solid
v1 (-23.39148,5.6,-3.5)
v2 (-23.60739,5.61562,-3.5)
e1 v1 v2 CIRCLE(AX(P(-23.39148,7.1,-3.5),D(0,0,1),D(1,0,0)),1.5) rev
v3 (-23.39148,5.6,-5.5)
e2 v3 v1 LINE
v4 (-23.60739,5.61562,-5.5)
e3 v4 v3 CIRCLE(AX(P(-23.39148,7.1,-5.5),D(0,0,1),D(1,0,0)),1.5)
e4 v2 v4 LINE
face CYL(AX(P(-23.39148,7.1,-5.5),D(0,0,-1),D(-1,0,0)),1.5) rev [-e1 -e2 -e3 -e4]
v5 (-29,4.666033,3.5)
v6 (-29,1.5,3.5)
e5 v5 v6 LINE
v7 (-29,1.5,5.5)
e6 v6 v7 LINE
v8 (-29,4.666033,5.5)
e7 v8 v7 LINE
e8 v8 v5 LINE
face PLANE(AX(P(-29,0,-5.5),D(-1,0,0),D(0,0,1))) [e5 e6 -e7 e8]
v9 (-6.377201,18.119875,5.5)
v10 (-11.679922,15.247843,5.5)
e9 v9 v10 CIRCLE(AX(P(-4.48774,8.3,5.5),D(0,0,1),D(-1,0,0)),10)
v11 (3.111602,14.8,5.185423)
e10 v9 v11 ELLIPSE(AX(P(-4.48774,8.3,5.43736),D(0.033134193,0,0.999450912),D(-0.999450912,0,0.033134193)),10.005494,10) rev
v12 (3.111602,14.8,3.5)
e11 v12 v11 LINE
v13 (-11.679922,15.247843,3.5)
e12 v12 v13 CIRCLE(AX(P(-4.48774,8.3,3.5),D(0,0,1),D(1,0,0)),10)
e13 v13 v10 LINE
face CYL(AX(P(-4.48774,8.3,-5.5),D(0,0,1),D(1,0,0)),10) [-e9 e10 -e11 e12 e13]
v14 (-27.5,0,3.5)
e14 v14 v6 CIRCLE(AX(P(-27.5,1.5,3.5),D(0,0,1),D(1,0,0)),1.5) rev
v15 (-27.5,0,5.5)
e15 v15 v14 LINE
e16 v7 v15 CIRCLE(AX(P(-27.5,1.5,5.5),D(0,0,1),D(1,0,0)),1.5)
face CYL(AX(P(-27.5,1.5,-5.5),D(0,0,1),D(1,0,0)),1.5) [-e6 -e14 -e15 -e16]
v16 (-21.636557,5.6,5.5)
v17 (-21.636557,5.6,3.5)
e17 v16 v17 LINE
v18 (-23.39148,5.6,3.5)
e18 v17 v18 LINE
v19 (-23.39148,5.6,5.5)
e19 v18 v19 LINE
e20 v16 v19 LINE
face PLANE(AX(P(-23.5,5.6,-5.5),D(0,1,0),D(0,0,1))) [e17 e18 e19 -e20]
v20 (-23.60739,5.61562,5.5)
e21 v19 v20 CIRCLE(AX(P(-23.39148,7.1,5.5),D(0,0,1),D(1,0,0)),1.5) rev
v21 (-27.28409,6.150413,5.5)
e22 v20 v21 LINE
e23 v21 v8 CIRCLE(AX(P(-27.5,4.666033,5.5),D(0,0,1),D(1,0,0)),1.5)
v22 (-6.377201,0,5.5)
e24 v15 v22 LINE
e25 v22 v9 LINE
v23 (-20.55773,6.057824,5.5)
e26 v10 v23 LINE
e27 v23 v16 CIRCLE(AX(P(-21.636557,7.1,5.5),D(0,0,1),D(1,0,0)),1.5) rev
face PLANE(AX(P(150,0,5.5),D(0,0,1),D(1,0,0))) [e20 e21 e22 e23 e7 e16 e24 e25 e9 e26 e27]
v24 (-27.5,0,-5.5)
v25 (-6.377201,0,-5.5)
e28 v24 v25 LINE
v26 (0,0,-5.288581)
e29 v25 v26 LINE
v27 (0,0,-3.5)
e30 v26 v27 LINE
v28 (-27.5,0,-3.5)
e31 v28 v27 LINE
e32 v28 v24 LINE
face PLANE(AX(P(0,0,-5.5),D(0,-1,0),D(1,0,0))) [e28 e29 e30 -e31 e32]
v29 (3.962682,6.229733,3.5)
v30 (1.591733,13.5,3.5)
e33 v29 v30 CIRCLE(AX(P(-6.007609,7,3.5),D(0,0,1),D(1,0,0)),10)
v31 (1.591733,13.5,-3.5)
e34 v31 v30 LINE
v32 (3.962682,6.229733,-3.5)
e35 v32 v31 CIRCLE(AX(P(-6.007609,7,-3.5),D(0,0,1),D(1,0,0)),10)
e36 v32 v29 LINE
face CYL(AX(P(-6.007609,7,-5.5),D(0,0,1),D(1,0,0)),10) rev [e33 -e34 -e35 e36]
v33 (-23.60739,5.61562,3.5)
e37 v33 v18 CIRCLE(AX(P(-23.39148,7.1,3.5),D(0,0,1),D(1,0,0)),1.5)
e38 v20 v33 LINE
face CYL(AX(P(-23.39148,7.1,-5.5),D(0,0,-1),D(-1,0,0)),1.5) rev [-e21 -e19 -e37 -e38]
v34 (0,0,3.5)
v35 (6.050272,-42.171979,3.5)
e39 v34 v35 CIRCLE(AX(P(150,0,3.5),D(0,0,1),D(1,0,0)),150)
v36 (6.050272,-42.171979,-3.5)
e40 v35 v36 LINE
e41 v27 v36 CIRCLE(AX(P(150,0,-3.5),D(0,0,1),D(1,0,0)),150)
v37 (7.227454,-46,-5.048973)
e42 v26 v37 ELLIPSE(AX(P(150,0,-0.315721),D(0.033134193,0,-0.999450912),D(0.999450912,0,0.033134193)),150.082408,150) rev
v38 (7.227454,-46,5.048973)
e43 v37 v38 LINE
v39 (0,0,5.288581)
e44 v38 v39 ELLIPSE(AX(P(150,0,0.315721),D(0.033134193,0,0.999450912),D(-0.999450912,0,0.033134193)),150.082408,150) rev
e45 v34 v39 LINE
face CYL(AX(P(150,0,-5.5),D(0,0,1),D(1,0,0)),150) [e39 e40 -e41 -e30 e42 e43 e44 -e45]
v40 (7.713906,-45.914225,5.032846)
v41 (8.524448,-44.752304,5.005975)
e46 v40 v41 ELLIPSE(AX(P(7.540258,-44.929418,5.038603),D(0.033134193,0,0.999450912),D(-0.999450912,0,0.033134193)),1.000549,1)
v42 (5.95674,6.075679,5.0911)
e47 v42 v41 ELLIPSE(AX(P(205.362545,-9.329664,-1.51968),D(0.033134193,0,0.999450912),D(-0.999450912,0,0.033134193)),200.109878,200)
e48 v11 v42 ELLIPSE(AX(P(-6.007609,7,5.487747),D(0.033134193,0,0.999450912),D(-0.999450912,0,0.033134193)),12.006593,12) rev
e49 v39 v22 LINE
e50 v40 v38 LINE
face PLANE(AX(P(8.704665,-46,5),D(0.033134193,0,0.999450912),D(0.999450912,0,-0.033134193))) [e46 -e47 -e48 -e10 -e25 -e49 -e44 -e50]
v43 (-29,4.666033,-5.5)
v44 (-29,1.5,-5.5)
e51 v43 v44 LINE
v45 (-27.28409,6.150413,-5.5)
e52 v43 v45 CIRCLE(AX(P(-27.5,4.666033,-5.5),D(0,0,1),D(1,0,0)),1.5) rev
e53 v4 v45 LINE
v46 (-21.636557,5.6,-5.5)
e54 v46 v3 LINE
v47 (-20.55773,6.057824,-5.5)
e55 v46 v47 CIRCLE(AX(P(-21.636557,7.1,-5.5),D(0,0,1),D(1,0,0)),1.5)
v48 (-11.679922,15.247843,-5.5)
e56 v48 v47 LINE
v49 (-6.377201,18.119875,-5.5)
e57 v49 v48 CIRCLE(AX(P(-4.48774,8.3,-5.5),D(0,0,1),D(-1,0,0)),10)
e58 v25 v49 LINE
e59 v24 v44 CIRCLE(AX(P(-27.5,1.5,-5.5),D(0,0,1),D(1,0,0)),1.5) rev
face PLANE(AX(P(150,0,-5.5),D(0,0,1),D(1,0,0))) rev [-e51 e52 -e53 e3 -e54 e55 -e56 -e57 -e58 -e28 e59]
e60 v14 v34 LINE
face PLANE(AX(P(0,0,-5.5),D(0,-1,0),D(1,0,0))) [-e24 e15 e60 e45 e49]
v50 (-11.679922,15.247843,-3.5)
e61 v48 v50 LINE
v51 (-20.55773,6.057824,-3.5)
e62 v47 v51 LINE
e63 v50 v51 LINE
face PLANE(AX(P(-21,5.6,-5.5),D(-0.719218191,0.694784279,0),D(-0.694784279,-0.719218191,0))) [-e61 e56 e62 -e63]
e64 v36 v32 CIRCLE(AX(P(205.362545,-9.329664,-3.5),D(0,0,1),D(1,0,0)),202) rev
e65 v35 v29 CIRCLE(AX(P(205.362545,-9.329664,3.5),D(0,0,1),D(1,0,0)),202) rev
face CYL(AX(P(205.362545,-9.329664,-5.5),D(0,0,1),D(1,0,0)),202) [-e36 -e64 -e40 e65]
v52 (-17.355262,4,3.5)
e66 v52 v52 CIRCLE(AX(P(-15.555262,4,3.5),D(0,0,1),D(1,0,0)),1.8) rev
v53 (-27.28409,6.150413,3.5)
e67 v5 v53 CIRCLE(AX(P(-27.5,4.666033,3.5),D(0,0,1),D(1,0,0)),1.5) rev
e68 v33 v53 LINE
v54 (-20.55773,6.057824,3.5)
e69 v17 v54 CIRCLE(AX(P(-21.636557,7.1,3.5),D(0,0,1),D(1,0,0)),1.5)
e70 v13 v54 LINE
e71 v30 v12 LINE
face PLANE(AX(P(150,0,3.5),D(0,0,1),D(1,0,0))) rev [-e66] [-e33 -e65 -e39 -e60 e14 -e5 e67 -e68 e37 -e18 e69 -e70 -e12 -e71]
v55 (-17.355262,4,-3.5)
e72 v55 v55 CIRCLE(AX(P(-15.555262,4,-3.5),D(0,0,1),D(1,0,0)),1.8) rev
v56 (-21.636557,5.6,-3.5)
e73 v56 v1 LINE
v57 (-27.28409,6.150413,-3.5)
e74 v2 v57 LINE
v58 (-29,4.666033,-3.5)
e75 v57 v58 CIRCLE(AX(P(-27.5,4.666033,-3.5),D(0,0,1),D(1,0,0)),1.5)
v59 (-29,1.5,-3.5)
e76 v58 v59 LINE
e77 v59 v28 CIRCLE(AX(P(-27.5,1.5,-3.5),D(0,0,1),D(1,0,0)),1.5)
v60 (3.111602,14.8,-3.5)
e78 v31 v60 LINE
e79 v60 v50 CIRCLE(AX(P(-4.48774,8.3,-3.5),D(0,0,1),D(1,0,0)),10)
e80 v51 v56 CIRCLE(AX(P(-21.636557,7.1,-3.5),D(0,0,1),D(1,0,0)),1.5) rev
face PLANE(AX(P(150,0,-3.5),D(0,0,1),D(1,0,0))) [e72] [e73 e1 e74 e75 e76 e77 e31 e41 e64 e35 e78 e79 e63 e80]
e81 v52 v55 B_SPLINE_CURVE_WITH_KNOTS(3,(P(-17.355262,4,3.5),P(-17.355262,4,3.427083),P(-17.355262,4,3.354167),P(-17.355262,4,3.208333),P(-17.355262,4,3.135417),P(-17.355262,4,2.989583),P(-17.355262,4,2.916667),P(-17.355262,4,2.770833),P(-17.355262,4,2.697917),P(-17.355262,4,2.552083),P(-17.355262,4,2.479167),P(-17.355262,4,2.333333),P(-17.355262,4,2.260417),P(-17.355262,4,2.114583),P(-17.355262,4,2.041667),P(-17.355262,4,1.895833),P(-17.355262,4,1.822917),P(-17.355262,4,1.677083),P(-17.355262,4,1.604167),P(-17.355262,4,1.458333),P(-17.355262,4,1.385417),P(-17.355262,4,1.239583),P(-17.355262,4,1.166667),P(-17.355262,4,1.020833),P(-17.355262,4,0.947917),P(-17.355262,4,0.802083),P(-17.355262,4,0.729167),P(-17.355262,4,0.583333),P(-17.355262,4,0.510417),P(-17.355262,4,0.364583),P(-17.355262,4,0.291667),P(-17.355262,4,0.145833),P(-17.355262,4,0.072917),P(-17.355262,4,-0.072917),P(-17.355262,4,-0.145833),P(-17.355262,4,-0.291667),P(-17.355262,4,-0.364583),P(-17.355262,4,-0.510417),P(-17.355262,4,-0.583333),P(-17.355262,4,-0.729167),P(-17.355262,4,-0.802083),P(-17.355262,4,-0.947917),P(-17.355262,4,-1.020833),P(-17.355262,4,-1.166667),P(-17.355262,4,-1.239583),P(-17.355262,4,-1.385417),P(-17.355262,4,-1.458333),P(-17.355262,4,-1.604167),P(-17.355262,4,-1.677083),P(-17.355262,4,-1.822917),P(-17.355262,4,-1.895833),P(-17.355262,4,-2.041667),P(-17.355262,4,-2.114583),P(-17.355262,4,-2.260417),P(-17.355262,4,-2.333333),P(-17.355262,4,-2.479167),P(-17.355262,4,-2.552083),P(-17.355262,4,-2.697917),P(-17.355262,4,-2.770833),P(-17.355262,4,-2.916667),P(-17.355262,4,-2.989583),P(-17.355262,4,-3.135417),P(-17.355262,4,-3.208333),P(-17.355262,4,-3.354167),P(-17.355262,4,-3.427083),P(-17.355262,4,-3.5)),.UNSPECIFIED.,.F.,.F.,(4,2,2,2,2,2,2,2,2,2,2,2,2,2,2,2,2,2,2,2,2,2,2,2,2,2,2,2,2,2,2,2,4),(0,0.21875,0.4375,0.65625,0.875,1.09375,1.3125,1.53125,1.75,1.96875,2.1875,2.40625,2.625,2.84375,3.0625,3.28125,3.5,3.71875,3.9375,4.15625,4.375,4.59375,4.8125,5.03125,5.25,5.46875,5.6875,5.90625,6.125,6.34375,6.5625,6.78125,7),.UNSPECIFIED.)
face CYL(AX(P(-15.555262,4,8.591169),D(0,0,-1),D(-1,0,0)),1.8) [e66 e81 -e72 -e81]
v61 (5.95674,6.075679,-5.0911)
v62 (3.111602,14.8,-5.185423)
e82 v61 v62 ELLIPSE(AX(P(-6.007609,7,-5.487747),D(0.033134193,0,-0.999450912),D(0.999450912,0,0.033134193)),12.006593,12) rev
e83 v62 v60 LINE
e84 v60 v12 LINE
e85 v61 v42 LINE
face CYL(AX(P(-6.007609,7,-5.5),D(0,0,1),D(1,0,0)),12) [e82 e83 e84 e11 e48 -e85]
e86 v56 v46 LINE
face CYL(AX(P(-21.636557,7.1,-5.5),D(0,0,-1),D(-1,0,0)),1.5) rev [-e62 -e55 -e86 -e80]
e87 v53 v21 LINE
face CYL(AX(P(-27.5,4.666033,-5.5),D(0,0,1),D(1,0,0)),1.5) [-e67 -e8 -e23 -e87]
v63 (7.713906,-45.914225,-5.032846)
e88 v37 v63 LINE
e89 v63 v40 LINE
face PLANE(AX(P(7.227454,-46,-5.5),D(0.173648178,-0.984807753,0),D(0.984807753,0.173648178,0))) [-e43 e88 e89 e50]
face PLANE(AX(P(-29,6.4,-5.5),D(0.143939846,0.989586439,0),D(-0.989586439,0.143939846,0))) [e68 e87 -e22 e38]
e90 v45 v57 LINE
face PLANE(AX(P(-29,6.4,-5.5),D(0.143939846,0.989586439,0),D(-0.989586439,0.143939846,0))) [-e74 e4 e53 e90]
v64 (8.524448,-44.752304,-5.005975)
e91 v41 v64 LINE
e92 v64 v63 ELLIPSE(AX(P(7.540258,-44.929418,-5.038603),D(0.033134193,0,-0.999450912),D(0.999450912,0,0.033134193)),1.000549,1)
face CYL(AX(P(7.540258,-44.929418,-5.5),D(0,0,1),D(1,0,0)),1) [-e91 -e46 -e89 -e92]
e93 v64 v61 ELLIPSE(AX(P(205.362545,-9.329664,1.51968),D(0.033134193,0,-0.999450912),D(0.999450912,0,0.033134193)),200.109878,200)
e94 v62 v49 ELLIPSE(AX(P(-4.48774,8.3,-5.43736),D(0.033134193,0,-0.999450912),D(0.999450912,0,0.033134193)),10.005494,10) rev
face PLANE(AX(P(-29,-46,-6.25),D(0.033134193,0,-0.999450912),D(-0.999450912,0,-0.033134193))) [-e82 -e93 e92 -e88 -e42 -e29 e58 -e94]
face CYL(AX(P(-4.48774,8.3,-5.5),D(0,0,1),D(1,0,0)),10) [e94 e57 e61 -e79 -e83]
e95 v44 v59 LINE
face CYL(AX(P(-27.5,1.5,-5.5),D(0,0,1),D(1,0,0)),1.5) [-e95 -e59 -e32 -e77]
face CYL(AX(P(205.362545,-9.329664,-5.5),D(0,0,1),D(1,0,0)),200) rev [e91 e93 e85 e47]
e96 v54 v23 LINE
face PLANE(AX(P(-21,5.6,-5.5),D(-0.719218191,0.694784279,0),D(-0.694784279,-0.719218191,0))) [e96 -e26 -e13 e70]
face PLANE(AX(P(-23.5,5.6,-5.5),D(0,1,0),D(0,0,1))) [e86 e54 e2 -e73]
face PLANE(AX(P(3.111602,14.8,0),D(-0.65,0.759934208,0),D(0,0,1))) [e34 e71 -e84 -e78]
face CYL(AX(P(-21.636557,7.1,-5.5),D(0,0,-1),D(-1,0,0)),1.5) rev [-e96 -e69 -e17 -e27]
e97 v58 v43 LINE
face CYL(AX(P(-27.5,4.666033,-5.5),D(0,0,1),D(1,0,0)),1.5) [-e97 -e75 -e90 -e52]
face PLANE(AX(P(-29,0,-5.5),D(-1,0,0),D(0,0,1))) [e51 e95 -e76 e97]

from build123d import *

# Parameters (mm, degrees)
BOSS_EXTRUDE1_DEPTH             = 5.5
BOSS_EXTRUDE1_DEPTH_BACK        = 5.5
SHELL4_START                    = -3.5
SHELL4_DEPTH                    = 7
CUT_EXTRUDE1_DEPTH              = 55.655740778
CUT_EXTRUDE1_DEPTH_BACK         = 55.655740778
SKETCH2_W                       = 69.221398806
SKETCH2_H                       = 30.475534722
BOSS_EXTRUDE2_REACH             = 56.656
SKETCH3_R                       = 1.8
BOSS_EXTRUDE2_DIRECTION_2_REACH = 56.656
FILLET1_R                       = 1.5
FILLET2_R                       = 1


# Read off the part's stored shape, not the designer's step: Shell4
with BuildPart() as part:
    # Sketch1 → Boss-Extrude1 (new, two sides: drawn at the far end of the back side and taken through both)
    with BuildSketch(Plane.XY.offset(-BOSS_EXTRUDE1_DEPTH_BACK)):
        with BuildLine():
            Line((0, 0), (-29, 0))
            Line((-29, 0), (-29, 6.4))
            Line((-29, 6.4), (-23.5, 5.6))
            Line((-23.5, 5.6), (-21, 5.6))
            Line((-21, 5.6), (-11.679922193, 15.24784279))
            ThreePointArc((-11.679922193, 15.24784279), (-4.185109089, 18.295419669), (3.11160179, 14.8))
            ThreePointArc((3.11160179, 14.8), (5.40105274, 10.720543521), (5.956739646, 6.07567938))
            ThreePointArc((5.956739646, 6.07567938), (5.643205462, -19.921417521), (8.704665249, -45.739527733))
            Line((8.704665249, -45.739527733), (7.227453619, -46))
            ThreePointArc((7.227453619, -46), (1.817879019, -23.282161013), (0, 0))
        make_face()
    extrude(amount=BOSS_EXTRUDE1_DEPTH + BOSS_EXTRUDE1_DEPTH_BACK)

    # Shell4 outline → Shell4 (cut)
    with BuildSketch(Plane.XY.offset(SHELL4_START)):
        with BuildLine():
            Line((1.591733374, 13.5), (3.11160179, 14.8))
            ThreePointArc((3.11160179, 14.8), (-4.185109088, 18.295419669), (-11.679922193, 15.24784279))
            Line((-11.679922193, 15.24784279), (-21, 5.6))
            Line((-21, 5.6), (-23.5, 5.6))
            Line((-23.5, 5.6), (-29, 6.4))
            Line((-29, 6.4), (-29, 0))
            Line((-29, 0), (0, 0))
            ThreePointArc((0, 0), (1.520272061, -21.301887027), (6.050271879, -42.171978539))
            ThreePointArc((6.050271879, -42.171978539), (3.550168012, -18.033934193), (3.962681588, 6.229732817))
            ThreePointArc((3.962681588, 6.229732817), (3.499609166, 10.100452934), (1.591733374, 13.5))
        make_face()
    extrude(amount=SHELL4_DEPTH, mode=Mode.SUBTRACT)

    # Sketch2 → Cut-Extrude1 (cut, two sides: drawn at the far end of the back side and taken through both)
    with BuildSketch(Plane(origin=(0, 0, 0), x_dir=(1, 0, 0), z_dir=(0, 1, 0)).offset(-CUT_EXTRUDE1_DEPTH_BACK)):
        Rectangle(SKETCH2_W, SKETCH2_H)
        Polygon((-29, 6.25), (8.704665249, 5), (8.704665249, -5), (-29, -6.25), align=None, mode=Mode.SUBTRACT)
    extrude(amount=CUT_EXTRUDE1_DEPTH + CUT_EXTRUDE1_DEPTH_BACK, mode=Mode.SUBTRACT)

    # Boss-Extrude2: up to this face of the body (flat: up to its plane)
    boss_extrude2_end = Plane(part.part.faces().sort_by_distance((-7.261638812, 3.224340324, 3.5))[0])
    # Sketch3 → Boss-Extrude2 (add, up to the picked face)
    with BuildSketch(Plane.XY, mode=Mode.PRIVATE) as boss_extrude2_sk1:
        with Locations(Location((-15.555262484, 4, 0), (0, 0, 180))):
            Circle(SKETCH3_R)
    boss_extrude2_tool1 = split(extrude(boss_extrude2_sk1.sketch, amount=BOSS_EXTRUDE2_REACH, mode=Mode.PRIVATE), bisect_by=boss_extrude2_end, keep=Keep.BOTH, mode=Mode.PRIVATE)
    add(boss_extrude2_tool1.solids().sort_by(Axis((-15.555262, 4, 0), (0, 0, 1)))[0])

    # Boss-Extrude2 direction 2: up to this face of the body (flat: up to its plane)
    boss_extrude2_direction_2_end = Plane(part.part.faces().sort_by_distance((-7.261638812, 3.224340324, -3.5))[0])
    # Sketch3 → Boss-Extrude2 direction 2 (add, up to the picked face)
    with BuildSketch(Plane.XY, mode=Mode.PRIVATE) as boss_extrude2_direction_2_sk1:
        with Locations(Location((-15.555262484, 4, 0), (0, 0, 180))):
            Circle(SKETCH3_R)
    boss_extrude2_direction_2_tool1 = split(extrude(boss_extrude2_direction_2_sk1.sketch, amount=-BOSS_EXTRUDE2_DIRECTION_2_REACH, mode=Mode.PRIVATE), bisect_by=boss_extrude2_direction_2_end, keep=Keep.BOTH, mode=Mode.PRIVATE)
    add(boss_extrude2_direction_2_tool1.solids().sort_by(Axis((-15.555262, 4, 0), (0, 0, -1)))[0])

    # Fillet1
    fillet1_edges = [part.edges().sort_by_distance(p)[0] for p in [
        (-29, 0, -4.5),
        (-29, 6.4, -4.5),
        (-23.5, 5.6, -4.5),
        (-21, 5.6, -4.5),
        (-21, 5.6, 4.5),
        (-23.5, 5.6, 4.5),
        (-29, 6.4, 4.5),
        (-29, 0, 4.5),
    ]]
    fillet(fillet1_edges, radius=FILLET1_R)

    # Fillet2
    fillet2_edges = [part.edges().sort_by_distance(p)[0] for p in [
        (8.704665249, -45.739527733, 0),
    ]]
    fillet(fillet2_edges, radius=FILLET2_R)


solid = part.part
